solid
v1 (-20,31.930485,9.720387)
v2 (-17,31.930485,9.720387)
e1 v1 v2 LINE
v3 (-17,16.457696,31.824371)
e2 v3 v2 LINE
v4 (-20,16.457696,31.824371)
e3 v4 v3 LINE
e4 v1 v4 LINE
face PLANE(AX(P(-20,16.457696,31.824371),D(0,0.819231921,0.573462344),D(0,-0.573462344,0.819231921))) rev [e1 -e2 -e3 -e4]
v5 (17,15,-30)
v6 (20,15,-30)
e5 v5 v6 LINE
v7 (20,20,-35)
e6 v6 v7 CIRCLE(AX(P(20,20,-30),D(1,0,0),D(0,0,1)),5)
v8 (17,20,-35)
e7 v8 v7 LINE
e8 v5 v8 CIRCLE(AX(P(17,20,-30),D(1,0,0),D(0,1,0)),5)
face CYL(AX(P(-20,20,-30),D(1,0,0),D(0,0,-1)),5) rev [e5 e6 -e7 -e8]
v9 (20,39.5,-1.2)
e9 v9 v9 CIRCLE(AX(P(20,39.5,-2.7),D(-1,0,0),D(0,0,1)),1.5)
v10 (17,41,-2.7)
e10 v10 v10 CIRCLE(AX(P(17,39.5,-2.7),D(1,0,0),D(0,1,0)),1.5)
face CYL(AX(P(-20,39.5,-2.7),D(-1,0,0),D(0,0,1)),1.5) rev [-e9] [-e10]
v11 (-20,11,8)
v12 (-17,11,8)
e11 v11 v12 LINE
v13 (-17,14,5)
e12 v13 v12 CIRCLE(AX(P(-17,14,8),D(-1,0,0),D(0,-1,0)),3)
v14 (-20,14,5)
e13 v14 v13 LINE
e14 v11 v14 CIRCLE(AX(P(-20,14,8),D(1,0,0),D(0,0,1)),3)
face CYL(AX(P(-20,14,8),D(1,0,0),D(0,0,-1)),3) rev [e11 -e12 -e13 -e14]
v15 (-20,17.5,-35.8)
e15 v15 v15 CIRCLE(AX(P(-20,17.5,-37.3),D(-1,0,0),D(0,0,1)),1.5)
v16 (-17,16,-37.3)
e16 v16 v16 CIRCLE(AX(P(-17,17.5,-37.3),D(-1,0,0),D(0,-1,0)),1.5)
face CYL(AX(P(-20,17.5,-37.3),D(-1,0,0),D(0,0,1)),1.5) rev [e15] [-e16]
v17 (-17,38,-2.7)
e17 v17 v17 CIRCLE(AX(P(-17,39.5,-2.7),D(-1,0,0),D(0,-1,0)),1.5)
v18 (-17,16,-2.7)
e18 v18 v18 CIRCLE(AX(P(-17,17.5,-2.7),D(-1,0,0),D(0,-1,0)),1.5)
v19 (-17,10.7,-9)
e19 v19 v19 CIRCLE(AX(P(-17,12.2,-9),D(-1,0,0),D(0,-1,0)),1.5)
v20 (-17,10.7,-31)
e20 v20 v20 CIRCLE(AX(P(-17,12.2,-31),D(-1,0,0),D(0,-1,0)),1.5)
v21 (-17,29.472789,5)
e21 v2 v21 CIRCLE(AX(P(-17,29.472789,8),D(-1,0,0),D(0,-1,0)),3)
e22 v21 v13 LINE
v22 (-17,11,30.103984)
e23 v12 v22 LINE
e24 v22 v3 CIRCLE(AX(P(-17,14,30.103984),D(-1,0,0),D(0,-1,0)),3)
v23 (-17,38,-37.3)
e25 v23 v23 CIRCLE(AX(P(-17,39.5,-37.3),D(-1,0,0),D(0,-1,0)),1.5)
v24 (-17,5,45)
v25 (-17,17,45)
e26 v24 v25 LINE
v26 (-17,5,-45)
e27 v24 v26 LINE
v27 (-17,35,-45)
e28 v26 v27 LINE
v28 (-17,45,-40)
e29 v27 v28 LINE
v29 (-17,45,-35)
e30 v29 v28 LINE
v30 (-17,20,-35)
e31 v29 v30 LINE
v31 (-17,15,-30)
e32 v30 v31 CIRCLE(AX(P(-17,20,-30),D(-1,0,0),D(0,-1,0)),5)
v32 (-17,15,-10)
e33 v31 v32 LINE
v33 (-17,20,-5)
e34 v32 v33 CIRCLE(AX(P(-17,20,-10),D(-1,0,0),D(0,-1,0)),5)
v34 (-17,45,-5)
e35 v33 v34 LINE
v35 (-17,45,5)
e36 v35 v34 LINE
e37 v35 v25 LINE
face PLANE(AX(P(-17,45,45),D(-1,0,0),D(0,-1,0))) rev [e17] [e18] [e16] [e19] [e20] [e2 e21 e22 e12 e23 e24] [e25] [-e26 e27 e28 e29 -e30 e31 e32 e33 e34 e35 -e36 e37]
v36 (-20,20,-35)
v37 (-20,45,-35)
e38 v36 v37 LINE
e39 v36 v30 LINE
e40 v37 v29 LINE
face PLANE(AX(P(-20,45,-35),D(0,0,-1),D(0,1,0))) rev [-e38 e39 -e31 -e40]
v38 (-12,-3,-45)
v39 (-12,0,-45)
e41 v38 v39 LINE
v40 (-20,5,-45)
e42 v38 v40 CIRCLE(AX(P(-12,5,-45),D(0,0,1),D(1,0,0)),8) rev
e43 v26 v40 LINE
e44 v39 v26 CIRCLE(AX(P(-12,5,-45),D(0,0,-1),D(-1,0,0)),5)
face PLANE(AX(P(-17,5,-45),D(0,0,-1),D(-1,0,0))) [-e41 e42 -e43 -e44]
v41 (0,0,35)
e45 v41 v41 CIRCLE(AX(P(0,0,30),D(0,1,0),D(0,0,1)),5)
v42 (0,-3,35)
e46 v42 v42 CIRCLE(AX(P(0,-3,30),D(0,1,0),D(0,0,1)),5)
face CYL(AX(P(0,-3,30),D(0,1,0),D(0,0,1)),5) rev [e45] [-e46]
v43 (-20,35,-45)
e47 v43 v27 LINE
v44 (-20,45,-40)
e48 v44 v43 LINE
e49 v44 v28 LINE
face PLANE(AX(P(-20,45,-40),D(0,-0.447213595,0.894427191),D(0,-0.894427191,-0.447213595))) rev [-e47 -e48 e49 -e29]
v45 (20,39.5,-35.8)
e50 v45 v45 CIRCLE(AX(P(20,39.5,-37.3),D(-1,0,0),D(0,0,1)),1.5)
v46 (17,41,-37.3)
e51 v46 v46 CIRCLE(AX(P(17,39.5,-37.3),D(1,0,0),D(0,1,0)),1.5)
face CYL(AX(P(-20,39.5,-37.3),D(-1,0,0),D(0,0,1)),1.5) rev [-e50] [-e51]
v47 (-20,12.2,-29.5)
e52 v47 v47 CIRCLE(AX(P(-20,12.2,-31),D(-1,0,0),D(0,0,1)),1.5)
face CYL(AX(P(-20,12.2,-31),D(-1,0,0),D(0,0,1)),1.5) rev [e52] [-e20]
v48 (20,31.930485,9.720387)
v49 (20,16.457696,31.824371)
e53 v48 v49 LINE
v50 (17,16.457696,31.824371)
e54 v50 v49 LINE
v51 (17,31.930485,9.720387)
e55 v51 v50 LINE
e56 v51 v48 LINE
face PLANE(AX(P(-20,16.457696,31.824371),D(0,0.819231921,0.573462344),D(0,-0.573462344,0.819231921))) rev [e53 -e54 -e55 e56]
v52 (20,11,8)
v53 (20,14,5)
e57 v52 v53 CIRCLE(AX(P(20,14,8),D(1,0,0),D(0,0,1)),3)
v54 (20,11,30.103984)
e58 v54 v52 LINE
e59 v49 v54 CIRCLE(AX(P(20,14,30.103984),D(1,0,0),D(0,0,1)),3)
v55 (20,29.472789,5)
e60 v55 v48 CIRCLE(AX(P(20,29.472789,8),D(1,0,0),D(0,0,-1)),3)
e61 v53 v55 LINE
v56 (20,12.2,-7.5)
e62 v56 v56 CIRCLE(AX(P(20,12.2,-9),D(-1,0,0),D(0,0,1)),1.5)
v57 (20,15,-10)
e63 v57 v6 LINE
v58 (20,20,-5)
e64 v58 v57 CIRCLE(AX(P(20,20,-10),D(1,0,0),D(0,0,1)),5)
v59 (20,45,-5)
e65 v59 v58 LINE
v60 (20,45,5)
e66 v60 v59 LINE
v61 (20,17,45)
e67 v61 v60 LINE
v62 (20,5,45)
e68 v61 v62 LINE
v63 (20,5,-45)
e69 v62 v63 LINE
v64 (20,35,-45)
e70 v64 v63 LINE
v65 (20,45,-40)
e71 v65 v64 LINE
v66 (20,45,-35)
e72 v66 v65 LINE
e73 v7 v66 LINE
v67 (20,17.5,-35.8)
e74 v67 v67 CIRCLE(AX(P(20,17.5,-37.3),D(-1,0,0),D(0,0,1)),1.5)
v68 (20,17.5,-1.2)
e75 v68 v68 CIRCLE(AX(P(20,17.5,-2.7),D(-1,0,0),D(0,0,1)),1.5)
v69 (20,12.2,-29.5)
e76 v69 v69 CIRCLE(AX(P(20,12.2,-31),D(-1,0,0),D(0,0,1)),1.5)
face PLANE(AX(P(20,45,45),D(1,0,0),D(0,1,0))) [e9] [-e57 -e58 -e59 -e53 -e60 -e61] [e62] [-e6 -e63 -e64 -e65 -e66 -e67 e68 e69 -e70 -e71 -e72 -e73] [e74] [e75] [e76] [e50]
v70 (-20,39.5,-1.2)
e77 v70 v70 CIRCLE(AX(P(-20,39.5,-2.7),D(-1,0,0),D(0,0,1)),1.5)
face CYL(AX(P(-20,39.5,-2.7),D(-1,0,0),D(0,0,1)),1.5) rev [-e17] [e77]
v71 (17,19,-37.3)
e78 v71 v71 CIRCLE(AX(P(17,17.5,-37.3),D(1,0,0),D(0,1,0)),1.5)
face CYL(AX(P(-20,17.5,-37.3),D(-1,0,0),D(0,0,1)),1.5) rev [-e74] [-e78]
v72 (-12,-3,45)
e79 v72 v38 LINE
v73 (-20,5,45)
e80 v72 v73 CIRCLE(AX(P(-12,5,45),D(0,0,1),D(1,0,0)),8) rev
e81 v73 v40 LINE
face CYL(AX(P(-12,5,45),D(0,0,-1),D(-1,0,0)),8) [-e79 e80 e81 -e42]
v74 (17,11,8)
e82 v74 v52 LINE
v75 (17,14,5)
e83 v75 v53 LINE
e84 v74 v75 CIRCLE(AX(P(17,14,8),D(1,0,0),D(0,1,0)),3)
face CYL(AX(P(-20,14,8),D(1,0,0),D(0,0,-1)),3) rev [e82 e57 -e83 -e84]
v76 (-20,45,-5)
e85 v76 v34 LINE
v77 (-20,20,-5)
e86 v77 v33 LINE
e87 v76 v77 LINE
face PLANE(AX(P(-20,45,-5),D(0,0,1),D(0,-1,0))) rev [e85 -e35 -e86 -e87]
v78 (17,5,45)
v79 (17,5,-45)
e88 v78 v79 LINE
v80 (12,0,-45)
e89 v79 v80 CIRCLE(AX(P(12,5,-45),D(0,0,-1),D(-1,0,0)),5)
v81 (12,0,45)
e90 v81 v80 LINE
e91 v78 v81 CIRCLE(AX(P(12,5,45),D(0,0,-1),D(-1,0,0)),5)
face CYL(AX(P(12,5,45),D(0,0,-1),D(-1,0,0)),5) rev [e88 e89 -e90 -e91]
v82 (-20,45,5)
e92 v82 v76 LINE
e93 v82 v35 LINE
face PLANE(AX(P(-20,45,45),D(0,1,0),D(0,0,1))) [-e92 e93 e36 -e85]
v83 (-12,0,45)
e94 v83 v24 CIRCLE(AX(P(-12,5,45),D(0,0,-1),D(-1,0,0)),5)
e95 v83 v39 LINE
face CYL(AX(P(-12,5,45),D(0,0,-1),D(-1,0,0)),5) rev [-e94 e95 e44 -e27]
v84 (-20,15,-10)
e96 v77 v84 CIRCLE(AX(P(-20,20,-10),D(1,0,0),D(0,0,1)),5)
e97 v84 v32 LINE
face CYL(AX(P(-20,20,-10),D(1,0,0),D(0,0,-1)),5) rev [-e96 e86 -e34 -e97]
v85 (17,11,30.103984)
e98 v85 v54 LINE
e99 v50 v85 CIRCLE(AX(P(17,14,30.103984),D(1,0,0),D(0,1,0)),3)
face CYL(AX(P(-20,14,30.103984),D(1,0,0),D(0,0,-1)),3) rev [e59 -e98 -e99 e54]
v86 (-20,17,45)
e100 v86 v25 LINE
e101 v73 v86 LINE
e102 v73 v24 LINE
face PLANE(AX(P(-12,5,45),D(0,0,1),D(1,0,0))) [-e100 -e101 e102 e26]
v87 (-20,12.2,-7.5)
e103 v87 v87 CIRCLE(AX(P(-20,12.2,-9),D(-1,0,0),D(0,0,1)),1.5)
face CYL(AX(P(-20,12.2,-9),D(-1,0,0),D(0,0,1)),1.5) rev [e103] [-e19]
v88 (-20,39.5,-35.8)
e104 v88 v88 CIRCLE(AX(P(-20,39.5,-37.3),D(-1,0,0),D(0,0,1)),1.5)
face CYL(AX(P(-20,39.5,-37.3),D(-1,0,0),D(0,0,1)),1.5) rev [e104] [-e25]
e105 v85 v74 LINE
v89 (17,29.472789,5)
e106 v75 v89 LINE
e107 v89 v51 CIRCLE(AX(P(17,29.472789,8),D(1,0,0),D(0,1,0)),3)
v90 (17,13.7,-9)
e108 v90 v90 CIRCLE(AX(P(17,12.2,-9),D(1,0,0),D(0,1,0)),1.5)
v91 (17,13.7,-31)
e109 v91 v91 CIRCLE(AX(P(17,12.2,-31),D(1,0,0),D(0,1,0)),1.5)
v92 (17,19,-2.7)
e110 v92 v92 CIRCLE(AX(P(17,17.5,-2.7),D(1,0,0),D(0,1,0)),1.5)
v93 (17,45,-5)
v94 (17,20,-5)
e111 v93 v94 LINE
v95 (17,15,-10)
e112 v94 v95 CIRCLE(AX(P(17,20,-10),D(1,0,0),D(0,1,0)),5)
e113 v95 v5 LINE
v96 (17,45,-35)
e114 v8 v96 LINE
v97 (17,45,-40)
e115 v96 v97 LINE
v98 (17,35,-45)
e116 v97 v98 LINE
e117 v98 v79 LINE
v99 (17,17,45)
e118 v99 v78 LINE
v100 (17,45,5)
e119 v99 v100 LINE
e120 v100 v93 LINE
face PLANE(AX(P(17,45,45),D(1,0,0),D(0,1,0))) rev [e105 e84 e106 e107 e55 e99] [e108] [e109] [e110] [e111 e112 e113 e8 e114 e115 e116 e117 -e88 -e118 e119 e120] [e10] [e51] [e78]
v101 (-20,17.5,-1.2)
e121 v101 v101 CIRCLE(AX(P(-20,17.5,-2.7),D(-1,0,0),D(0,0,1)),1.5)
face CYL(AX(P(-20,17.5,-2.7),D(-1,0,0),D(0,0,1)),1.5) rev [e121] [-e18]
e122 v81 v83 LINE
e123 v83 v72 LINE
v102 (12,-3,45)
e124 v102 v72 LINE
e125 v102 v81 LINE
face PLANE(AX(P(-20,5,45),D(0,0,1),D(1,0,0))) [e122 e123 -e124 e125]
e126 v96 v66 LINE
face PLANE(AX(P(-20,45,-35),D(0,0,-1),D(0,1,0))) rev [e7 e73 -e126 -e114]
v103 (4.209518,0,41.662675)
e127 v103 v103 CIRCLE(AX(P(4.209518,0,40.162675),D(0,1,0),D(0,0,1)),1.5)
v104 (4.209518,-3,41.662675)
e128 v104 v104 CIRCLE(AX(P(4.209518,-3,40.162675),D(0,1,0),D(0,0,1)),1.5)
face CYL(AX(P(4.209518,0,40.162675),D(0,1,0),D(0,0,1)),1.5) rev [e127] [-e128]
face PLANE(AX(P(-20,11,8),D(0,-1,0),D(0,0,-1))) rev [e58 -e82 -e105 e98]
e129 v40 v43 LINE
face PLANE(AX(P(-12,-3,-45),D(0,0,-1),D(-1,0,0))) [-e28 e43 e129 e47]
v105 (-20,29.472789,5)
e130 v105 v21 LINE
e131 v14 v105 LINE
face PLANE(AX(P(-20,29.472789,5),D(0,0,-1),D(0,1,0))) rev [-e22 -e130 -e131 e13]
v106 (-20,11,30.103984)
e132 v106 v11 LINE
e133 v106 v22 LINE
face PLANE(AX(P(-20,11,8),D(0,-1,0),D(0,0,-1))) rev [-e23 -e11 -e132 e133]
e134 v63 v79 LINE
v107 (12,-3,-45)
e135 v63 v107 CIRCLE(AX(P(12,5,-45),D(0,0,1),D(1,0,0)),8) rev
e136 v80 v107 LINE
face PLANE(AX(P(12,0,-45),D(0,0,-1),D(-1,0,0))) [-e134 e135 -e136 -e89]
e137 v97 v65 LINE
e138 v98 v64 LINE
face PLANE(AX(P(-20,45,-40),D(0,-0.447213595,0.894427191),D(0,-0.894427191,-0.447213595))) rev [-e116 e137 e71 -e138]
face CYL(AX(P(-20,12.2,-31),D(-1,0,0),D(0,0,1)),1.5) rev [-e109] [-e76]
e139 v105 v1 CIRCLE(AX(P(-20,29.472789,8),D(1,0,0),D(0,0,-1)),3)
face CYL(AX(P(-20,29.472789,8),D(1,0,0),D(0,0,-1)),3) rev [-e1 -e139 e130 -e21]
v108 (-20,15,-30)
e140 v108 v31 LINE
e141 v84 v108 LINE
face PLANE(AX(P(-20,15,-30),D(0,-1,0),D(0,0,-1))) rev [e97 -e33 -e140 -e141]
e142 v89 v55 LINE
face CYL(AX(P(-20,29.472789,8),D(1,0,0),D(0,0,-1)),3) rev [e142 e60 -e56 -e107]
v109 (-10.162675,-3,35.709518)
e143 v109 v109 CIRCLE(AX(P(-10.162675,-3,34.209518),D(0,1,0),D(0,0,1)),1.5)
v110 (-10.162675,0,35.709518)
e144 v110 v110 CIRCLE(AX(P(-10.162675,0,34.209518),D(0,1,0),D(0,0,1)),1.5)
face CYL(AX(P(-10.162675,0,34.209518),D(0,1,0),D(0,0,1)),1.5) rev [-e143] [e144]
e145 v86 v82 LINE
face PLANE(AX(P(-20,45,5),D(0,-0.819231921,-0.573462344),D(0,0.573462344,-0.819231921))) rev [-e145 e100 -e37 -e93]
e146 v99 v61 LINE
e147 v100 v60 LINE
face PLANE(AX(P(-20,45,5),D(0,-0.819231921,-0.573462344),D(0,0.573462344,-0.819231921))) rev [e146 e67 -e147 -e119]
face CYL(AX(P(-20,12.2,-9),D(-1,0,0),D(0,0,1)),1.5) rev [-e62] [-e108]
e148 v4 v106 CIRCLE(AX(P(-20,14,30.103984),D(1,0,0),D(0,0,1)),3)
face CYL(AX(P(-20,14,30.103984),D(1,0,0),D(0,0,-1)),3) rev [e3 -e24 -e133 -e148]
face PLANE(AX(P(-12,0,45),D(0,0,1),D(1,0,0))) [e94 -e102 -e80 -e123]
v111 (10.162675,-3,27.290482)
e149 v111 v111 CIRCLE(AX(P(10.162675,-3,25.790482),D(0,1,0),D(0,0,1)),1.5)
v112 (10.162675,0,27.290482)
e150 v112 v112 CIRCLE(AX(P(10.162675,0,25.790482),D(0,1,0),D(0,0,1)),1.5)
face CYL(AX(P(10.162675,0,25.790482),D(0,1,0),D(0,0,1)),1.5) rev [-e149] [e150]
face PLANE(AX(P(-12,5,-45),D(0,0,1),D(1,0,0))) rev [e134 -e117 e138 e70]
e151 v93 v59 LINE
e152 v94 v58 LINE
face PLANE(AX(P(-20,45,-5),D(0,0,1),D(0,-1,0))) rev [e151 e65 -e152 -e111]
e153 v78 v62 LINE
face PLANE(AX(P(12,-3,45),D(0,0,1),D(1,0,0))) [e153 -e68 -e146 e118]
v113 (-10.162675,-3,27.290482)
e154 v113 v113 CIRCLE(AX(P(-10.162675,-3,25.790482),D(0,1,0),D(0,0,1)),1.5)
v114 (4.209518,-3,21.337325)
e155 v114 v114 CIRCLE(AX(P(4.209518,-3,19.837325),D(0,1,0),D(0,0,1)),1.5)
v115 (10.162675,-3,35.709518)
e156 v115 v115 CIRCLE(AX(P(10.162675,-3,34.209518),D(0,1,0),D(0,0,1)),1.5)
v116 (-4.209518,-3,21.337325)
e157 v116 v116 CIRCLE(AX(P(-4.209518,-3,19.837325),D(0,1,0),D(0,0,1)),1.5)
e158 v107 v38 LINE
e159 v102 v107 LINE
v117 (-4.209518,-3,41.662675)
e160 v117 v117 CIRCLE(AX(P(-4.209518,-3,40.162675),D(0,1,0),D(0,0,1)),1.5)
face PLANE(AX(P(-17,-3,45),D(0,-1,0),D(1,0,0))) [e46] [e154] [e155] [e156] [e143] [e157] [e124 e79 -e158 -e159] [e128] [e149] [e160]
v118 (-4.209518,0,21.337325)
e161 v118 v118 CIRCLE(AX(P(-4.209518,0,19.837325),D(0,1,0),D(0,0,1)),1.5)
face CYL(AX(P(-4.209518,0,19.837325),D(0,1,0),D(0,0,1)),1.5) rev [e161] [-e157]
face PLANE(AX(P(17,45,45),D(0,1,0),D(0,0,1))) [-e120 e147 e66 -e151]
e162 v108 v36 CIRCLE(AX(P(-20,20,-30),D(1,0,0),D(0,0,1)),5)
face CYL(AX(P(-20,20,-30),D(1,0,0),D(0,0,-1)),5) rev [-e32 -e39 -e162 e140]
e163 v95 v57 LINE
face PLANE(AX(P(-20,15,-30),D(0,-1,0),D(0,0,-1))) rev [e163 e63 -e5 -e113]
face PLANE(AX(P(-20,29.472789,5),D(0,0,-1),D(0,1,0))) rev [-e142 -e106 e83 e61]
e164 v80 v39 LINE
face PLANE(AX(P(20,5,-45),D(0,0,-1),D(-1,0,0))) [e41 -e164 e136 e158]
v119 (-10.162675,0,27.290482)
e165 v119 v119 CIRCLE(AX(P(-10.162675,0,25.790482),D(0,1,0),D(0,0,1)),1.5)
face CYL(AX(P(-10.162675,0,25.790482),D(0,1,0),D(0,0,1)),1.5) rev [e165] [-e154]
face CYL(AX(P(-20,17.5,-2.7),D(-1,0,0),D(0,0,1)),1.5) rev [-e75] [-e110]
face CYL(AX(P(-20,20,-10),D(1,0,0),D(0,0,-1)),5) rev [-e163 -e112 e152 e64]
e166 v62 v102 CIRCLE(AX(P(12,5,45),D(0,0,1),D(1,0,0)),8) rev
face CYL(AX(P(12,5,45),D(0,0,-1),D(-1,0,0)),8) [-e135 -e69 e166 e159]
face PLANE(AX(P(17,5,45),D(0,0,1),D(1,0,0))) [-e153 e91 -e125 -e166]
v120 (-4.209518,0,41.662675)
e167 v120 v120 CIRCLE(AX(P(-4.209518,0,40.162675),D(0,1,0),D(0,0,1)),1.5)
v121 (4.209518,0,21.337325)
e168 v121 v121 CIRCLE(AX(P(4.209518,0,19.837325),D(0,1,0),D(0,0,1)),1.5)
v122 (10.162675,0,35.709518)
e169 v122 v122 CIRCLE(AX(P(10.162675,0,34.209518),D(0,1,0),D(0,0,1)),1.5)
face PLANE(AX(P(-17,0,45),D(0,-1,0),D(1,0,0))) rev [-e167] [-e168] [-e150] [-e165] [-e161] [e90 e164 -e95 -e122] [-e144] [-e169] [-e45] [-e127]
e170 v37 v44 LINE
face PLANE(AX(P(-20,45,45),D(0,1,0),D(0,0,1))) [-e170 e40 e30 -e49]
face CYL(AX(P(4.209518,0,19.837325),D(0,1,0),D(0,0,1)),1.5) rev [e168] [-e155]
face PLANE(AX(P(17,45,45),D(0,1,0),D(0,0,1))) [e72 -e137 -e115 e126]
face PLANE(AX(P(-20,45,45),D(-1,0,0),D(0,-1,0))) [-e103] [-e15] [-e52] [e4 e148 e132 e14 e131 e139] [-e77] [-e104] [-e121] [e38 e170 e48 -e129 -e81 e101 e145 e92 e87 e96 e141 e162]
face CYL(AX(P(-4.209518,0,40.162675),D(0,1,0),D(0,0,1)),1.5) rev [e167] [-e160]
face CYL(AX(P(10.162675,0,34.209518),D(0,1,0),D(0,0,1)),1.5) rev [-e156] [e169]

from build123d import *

# Parameters (mm, degrees)
BASIS_BLECH1_DEPTH                   = 45
SKIZZE3_R                            = 5
SCHNITT_LINEAR_AUSTRAGEN2_DEPTH      = 67.708320321
SCHNITT_LINEAR_AUSTRAGEN1_DEPTH      = 67.708320321
SCHNITT_LINEAR_AUSTRAGEN1_DEPTH_BACK = 67.708320321
F_3_0_3_DURCHMESSER_BOHRUNG1_D       = 3
F_3_0_3_DURCHMESSER_BOHRUNG2_D       = 3


# Sheet-metal steps are written as plain solids
with BuildPart() as part:
    # Skizze1 → Basis-Blech1 (new, symmetric)
    with BuildSketch(Plane.XY):
        with BuildLine():
            Line((-17, 45), (-17, 5))
            ThreePointArc((-17, 5), (-15.535533906, 1.464466094), (-12, 0))
            Line((-12, 0), (12, 0))
            ThreePointArc((12, 0), (15.535533906, 1.464466094), (17, 5))
            Line((17, 5), (17, 45))
            Line((17, 45), (20, 45))
            Line((20, 45), (20, 5))
            ThreePointArc((20, 5), (17.656854249, -0.656854249), (12, -3))
            Line((12, -3), (-12, -3))
            ThreePointArc((-12, -3), (-17.656854249, -0.656854249), (-20, 5))
            Line((-20, 5), (-20, 45))
            Line((-20, 45), (-17, 45))
        make_face()
    extrude(amount=BASIS_BLECH1_DEPTH, both=True)

    # Skizze3 → Schnitt-Linear austragen2 (cut, through all)
    with BuildSketch(Plane(origin=(0, 0, 0), x_dir=(1, 0, 0), z_dir=(0, 1, 0))):
        with Locations(Location((0, -30, 0), (0, 0, 270))):
            Circle(SKIZZE3_R)
    extrude(amount=-SCHNITT_LINEAR_AUSTRAGEN2_DEPTH, mode=Mode.SUBTRACT)

    # Skizze2 → Schnitt-Linear austragen1 (cut, two sides: drawn at the far end of the back side and taken through both)
    with BuildSketch(Plane(origin=(0, 0, 0), x_dir=(0, 0, -1), z_dir=(1, 0, 0)).offset(-SCHNITT_LINEAR_AUSTRAGEN1_DEPTH_BACK)):
        with BuildLine():
            Line((35, 45), (5, 45))
            Line((5, 45), (5, 20))
            ThreePointArc((5, 20), (6.464466094, 16.464466094), (10, 15))
            Line((10, 15), (30, 15))
            ThreePointArc((30, 15), (33.535533906, 16.464466094), (35, 20))
            Line((35, 20), (35, 45))
        make_face()
        Polygon((-45, 45), (-5, 45), (-45, 17), align=None)
        Polygon((45, 45), (40, 45), (45, 35), align=None)
        with BuildLine():
            Line((-5, 29.472788823), (-5, 14))
            ThreePointArc((-5, 14), (-5.878679656, 11.878679656), (-8, 11))
            Line((-8, 11), (-30.103984032, 11))
            ThreePointArc((-30.103984032, 11), (-32.965197698, 13.098081845), (-31.824371066, 16.457695762))
            Line((-31.824371066, 16.457695762), (-9.720387033, 31.930484584))
            ThreePointArc((-9.720387033, 31.930484584), (-6.614568858, 32.133724852), (-5, 29.472788823))
        make_face()
    extrude(amount=SCHNITT_LINEAR_AUSTRAGEN1_DEPTH + SCHNITT_LINEAR_AUSTRAGEN1_DEPTH_BACK, mode=Mode.SUBTRACT)

    # Ø3.0 (3) Durchmesser Bohrung1 (through all)
    with Locations(Plane.ZY.offset(20)):
        with Locations((-37.3, 39.5), (-37.3, 17.5), (-31, 12.2), (-9, 12.2), (-2.7, 17.5), (-2.7, 39.5)):
            Hole(F_3_0_3_DURCHMESSER_BOHRUNG1_D / 2)

    # Ø3.0 (3) Durchmesser Bohrung2 (through all)
    with Locations(Plane(origin=(0, 0, 0), x_dir=(1, 0, 0), z_dir=(0, 1, 0))):
        with Locations((10.162674858, -25.790482244), (4.209517756, -19.837325142), (-4.209517756, -19.837325142), (-10.162674858, -25.790482244), (-10.162674858, -34.209517756), (-4.209517756, -40.162674858), (4.209517756, -40.162674858), (10.162674858, -34.209517756)):
            Hole(F_3_0_3_DURCHMESSER_BOHRUNG2_D / 2)


solid = part.part
